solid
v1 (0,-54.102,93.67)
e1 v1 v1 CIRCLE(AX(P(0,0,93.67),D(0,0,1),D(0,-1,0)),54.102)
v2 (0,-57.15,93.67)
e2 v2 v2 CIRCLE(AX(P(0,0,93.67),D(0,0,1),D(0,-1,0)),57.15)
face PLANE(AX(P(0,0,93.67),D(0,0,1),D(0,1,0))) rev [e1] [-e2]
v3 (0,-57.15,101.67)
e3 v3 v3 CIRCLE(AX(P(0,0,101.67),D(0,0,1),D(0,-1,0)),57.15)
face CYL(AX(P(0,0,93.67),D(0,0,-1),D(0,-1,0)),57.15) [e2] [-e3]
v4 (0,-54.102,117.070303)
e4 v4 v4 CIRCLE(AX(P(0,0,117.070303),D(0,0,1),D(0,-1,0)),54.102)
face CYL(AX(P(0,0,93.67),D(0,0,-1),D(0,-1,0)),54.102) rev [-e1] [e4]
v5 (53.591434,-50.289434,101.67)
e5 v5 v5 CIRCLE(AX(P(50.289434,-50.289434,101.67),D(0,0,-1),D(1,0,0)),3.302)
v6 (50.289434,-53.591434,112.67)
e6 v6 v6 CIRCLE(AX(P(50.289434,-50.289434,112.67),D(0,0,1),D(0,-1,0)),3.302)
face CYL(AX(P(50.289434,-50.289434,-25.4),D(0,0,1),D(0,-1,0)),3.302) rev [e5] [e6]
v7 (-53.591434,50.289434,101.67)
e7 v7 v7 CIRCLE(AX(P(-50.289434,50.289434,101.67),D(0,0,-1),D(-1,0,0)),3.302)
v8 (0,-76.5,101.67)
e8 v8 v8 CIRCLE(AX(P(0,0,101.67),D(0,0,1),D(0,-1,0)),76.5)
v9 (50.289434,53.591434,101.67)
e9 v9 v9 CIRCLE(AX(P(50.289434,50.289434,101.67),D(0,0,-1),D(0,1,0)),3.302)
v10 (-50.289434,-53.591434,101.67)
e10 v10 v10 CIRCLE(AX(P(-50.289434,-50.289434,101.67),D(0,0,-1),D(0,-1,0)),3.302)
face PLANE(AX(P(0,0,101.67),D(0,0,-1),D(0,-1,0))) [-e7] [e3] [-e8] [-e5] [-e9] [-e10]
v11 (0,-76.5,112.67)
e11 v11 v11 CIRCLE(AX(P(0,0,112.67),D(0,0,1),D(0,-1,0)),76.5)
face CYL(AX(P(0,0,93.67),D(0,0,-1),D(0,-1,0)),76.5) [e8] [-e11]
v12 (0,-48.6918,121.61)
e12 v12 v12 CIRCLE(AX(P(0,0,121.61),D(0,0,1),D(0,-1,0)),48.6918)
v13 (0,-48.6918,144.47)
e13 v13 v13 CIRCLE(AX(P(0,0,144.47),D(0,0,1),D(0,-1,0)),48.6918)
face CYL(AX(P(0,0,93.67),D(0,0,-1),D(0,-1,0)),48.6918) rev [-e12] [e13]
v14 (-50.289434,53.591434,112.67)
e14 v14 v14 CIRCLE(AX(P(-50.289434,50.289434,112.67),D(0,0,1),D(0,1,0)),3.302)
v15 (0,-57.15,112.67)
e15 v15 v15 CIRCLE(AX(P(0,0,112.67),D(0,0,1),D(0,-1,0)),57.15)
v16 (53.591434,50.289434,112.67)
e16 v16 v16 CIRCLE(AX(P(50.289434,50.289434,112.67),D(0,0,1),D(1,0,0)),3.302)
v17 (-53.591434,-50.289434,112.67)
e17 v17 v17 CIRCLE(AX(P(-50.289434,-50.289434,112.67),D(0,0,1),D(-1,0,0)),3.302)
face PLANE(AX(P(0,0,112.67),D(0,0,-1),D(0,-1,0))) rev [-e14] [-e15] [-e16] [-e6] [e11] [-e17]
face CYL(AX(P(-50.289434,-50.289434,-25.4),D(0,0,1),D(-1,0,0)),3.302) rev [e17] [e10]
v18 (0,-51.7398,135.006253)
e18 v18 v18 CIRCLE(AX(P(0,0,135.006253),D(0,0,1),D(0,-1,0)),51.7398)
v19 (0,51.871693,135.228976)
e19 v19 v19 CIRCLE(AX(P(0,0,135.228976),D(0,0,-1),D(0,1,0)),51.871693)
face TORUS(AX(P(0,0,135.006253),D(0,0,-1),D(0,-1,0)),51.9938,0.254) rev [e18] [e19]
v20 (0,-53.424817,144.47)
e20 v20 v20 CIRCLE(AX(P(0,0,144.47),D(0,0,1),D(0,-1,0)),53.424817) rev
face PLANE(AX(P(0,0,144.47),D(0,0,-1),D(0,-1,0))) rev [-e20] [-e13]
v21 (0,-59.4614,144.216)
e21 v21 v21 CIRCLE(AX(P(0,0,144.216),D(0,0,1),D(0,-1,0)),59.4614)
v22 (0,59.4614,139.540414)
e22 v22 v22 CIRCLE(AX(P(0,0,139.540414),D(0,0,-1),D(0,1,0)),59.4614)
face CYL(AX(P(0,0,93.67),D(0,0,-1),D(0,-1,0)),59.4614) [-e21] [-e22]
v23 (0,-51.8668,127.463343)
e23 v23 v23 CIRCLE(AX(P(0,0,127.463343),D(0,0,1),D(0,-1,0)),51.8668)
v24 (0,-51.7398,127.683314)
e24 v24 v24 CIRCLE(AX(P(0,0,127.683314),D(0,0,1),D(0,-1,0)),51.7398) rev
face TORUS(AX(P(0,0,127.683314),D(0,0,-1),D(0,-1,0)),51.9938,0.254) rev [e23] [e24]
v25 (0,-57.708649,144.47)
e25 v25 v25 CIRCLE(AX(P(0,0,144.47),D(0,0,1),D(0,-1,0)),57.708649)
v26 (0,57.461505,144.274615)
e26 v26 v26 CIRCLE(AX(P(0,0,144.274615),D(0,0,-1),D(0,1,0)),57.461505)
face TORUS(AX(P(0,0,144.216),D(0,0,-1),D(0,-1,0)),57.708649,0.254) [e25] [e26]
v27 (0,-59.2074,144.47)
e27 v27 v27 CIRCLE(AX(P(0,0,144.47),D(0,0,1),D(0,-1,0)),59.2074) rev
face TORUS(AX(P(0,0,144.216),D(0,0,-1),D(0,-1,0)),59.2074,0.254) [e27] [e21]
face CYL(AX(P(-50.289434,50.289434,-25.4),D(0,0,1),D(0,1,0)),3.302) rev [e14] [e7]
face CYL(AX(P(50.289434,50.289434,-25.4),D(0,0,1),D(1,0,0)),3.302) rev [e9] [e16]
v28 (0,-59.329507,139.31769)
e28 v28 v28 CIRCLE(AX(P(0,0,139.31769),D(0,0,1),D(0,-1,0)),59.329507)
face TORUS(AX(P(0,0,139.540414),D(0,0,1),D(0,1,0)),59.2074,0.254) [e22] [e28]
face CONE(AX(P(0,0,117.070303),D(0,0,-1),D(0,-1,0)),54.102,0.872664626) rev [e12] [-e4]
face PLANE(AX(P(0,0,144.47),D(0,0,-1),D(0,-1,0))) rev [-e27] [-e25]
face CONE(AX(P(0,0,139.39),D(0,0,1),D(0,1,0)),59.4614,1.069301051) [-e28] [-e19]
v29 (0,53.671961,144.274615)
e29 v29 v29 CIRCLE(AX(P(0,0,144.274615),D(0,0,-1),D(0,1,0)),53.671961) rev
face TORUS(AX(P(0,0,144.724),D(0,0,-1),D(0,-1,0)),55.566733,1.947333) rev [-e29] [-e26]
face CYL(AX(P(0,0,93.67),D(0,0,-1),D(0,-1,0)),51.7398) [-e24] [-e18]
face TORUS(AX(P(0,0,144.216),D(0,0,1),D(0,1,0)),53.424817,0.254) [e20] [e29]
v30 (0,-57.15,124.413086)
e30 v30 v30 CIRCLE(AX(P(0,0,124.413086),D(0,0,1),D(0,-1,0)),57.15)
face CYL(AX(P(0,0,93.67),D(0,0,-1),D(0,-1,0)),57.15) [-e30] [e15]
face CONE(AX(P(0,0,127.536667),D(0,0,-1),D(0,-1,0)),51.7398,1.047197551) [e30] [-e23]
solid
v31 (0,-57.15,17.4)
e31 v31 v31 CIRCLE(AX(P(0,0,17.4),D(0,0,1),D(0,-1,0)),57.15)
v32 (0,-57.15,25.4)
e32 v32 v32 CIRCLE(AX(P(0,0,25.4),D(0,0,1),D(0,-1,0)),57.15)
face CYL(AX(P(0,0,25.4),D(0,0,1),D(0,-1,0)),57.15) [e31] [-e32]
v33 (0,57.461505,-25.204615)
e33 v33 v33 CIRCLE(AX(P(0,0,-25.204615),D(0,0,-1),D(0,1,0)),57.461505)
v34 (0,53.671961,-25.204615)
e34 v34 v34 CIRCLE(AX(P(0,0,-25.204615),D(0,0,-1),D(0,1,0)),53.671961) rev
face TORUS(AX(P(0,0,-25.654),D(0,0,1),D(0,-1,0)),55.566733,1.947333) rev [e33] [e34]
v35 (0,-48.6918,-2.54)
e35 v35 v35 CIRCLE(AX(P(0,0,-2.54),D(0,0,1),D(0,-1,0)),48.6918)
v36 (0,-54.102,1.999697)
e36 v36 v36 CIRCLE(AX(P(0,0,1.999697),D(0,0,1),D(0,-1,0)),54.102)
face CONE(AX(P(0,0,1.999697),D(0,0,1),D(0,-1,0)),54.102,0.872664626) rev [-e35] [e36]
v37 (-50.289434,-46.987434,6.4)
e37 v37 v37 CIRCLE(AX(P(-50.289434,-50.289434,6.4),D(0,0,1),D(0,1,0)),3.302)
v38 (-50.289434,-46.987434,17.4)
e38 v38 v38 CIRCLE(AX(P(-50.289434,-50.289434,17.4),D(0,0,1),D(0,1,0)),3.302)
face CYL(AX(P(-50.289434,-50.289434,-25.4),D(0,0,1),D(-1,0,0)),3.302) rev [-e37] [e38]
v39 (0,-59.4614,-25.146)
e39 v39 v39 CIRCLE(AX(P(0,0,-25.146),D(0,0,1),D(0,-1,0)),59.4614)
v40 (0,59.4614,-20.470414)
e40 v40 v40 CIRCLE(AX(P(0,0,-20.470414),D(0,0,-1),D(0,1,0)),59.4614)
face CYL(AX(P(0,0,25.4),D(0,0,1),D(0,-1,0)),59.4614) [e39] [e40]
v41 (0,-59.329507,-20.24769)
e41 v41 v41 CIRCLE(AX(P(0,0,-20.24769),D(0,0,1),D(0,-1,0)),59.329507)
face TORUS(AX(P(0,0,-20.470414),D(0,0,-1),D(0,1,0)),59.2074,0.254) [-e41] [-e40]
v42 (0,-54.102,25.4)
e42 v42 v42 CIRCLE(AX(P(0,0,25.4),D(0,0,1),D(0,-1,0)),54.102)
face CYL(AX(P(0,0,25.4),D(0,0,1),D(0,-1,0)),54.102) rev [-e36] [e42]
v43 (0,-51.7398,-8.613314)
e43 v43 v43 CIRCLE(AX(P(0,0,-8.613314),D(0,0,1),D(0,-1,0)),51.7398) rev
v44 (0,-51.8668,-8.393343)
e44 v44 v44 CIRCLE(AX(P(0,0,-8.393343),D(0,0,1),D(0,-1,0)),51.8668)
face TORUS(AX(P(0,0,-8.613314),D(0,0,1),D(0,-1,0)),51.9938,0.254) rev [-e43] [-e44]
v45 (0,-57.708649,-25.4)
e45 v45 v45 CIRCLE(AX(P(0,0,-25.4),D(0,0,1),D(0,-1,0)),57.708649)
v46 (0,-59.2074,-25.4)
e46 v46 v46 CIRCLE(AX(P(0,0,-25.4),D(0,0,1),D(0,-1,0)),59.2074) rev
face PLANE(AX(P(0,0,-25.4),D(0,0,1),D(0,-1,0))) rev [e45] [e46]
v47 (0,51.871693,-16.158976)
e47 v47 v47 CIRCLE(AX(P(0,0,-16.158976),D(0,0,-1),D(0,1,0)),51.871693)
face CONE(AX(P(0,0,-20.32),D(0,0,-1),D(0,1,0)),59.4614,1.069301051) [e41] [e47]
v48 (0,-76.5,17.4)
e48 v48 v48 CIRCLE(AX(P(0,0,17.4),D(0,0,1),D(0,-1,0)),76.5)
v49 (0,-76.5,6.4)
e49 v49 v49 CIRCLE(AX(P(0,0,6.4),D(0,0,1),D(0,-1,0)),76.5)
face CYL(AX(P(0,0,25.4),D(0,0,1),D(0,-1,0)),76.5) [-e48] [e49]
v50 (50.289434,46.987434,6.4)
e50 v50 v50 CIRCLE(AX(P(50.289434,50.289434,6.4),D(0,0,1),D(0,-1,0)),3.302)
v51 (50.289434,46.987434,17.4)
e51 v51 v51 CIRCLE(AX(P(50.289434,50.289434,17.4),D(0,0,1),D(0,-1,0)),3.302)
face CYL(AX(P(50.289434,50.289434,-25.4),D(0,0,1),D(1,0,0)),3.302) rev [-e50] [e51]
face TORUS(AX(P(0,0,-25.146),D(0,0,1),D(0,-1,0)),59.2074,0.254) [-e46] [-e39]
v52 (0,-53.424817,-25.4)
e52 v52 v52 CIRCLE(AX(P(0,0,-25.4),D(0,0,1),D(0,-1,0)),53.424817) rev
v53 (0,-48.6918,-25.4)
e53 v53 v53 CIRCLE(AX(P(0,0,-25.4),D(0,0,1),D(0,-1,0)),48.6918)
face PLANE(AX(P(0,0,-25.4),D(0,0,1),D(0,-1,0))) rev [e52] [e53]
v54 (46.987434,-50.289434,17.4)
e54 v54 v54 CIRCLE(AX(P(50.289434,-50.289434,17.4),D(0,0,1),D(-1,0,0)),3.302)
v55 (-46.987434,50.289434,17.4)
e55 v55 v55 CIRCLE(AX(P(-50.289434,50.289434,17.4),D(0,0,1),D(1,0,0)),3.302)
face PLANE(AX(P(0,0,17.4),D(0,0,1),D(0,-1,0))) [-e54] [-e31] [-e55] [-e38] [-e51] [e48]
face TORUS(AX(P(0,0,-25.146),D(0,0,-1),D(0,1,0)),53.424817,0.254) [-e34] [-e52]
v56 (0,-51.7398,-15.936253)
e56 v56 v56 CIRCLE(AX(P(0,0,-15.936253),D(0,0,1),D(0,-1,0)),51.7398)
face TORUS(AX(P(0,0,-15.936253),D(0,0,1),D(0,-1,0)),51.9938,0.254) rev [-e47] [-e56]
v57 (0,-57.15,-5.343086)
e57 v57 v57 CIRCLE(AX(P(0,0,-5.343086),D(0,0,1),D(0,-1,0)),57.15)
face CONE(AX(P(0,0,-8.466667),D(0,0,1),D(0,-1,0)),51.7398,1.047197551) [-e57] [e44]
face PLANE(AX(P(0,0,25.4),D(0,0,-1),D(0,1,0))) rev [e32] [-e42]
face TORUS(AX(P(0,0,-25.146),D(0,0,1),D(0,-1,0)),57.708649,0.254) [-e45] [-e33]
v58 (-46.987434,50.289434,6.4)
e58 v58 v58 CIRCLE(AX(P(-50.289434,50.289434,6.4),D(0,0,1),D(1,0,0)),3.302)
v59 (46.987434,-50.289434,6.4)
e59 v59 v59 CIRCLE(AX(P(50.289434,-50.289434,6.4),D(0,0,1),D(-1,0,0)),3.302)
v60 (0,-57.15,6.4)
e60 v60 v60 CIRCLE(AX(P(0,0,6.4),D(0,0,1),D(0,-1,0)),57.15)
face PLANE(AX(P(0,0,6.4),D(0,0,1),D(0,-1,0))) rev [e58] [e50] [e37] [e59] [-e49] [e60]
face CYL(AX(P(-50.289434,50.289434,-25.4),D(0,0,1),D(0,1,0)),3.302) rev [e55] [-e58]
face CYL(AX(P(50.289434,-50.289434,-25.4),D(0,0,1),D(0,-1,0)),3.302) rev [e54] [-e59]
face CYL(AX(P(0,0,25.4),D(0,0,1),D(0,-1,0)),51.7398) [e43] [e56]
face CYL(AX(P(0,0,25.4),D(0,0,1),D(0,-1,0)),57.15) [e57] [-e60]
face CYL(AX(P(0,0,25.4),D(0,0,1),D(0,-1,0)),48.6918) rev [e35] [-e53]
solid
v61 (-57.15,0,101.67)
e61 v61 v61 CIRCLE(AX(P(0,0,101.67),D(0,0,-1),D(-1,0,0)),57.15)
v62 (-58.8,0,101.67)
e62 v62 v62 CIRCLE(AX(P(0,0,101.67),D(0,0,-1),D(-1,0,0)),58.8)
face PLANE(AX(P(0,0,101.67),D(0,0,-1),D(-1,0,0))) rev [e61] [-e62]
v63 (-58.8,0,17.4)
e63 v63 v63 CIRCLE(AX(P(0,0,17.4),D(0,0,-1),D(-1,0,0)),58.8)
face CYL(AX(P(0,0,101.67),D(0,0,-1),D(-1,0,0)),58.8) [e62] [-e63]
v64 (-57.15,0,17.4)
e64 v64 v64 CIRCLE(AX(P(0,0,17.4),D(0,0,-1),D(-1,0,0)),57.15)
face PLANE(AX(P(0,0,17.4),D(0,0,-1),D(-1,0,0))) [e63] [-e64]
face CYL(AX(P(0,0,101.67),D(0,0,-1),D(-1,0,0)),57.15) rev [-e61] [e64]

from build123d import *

# Parameters (mm, degrees)
FILLET1_R           = 0.254
SKETCH3_R           = 58.8
SKETCH3_R_2         = 57.15
BOSS_EXTRUDE1_DEPTH = 84.27
SKETCH4_R           = 3.302
CUT_EXTRUDE1_DEPTH  = 176.40759655
CIRPATTERN1_COUNT   = 4


# Read off the part's stored shape, not the designer's step: Revolve1
with BuildPart() as part:
    # Revolve1 outline → Revolve1 (revolve)
    with BuildSketch(Plane.XZ):
        with BuildLine():
            Line((57.15, -5.34308624), (57.15, 6.4))
            Line((57.15, 6.4), (76.5, 6.4))
            Line((76.5, 6.4), (76.5, 17.4))
            Line((76.5, 17.4), (57.15, 17.4))
            Line((57.15, 17.4), (57.15, 25.4))
            Line((57.15, 25.4), (54.102, 25.4))
            Line((54.102, 25.4), (54.102, 1.999696825))
            Line((54.102, 1.999696825), (48.6918, -2.54))
            Line((48.6918, -2.54), (48.6918, -25.4))
            Line((48.6918, -25.4), (53.63603628, -25.4))
            ThreePointArc((53.63603628, -25.4), (55.566733333, -23.706666667), (57.497430386, -25.4))
            Line((57.497430386, -25.4), (59.4614, -25.4))
            Line((59.4614, -25.4), (59.4614, -20.32))
            Line((59.4614, -20.32), (51.7398, -16.086666667))
            Line((51.7398, -16.086666667), (51.7398, -8.466666667))
            Line((51.7398, -8.466666667), (57.15, -5.34308624))
        make_face()
    revolve(axis=Axis((0, 0, 0), (0, 0, 1)))

    # Fillet1
    fillet1_edges = [part.edges().sort_by_distance(p)[0] for p in [
        (-51.7398, 0, -8.466666667),
        (-51.7398, 0, -16.086666667),
        (-59.4614, 0, -20.32),
        (-59.4614, 0, -25.4),
        (-57.497430386, 0, -25.4),
        (-53.63603628, 0, -25.4),
    ]]
    fillet(fillet1_edges, radius=FILLET1_R)


with BuildPart() as body_2:
    # Sketch3 → Boss-Extrude1 (new body)
    with BuildSketch(Plane(origin=(0, 0, 17.4), x_dir=(-1, 0, 0), z_dir=(0, 0, -1))):
        Circle(SKETCH3_R)
        Circle(SKETCH3_R_2, mode=Mode.SUBTRACT)
    extrude(amount=-BOSS_EXTRUDE1_DEPTH)


with BuildPart() as body_3:
    # Mirror1: mirrored copy
    add(part.part.mirror(Plane.XY.offset(59.535)))


with BuildPart() as cut_extrude1_tool:
    # Sketch4 → Cut-Extrude1 (new, through all)
    with BuildSketch(Plane.XY.offset(112.67)):
        with Locations((50.289434278, 50.289434278)):
            Circle(SKETCH4_R)
    cut_extrude1 = extrude(amount=-CUT_EXTRUDE1_DEPTH)


with BuildPart() as part_1:
    add(part.part)

    # Cut-Extrude1: cut by cut_extrude1_tool
    add(cut_extrude1_tool.part, mode=Mode.SUBTRACT)


with BuildPart() as body_3_1:
    add(body_3.part)

    # Cut-Extrude1: cut by cut_extrude1_tool
    add(cut_extrude1_tool.part, mode=Mode.SUBTRACT)


with BuildPart() as cirpattern1_tool:
    # CirPattern1: Cut-Extrude1 ×4 about axis
    cirpattern1_axis = Axis((0, 0, 0), (0, 0, 1))
    for i in range(1, CIRPATTERN1_COUNT):
        add(cut_extrude1.rotate(cirpattern1_axis, i * 360 / CIRPATTERN1_COUNT))


with BuildPart() as part_2:
    add(part_1.part)

    # CirPattern1: cut by cirpattern1_tool
    add(cirpattern1_tool.part, mode=Mode.SUBTRACT)


with BuildPart() as body_3_2:
    add(body_3_1.part)

    # CirPattern1: cut by cirpattern1_tool
    add(cirpattern1_tool.part, mode=Mode.SUBTRACT)


solid = Compound([body_2.part, part_2.part, body_3_2.part])
